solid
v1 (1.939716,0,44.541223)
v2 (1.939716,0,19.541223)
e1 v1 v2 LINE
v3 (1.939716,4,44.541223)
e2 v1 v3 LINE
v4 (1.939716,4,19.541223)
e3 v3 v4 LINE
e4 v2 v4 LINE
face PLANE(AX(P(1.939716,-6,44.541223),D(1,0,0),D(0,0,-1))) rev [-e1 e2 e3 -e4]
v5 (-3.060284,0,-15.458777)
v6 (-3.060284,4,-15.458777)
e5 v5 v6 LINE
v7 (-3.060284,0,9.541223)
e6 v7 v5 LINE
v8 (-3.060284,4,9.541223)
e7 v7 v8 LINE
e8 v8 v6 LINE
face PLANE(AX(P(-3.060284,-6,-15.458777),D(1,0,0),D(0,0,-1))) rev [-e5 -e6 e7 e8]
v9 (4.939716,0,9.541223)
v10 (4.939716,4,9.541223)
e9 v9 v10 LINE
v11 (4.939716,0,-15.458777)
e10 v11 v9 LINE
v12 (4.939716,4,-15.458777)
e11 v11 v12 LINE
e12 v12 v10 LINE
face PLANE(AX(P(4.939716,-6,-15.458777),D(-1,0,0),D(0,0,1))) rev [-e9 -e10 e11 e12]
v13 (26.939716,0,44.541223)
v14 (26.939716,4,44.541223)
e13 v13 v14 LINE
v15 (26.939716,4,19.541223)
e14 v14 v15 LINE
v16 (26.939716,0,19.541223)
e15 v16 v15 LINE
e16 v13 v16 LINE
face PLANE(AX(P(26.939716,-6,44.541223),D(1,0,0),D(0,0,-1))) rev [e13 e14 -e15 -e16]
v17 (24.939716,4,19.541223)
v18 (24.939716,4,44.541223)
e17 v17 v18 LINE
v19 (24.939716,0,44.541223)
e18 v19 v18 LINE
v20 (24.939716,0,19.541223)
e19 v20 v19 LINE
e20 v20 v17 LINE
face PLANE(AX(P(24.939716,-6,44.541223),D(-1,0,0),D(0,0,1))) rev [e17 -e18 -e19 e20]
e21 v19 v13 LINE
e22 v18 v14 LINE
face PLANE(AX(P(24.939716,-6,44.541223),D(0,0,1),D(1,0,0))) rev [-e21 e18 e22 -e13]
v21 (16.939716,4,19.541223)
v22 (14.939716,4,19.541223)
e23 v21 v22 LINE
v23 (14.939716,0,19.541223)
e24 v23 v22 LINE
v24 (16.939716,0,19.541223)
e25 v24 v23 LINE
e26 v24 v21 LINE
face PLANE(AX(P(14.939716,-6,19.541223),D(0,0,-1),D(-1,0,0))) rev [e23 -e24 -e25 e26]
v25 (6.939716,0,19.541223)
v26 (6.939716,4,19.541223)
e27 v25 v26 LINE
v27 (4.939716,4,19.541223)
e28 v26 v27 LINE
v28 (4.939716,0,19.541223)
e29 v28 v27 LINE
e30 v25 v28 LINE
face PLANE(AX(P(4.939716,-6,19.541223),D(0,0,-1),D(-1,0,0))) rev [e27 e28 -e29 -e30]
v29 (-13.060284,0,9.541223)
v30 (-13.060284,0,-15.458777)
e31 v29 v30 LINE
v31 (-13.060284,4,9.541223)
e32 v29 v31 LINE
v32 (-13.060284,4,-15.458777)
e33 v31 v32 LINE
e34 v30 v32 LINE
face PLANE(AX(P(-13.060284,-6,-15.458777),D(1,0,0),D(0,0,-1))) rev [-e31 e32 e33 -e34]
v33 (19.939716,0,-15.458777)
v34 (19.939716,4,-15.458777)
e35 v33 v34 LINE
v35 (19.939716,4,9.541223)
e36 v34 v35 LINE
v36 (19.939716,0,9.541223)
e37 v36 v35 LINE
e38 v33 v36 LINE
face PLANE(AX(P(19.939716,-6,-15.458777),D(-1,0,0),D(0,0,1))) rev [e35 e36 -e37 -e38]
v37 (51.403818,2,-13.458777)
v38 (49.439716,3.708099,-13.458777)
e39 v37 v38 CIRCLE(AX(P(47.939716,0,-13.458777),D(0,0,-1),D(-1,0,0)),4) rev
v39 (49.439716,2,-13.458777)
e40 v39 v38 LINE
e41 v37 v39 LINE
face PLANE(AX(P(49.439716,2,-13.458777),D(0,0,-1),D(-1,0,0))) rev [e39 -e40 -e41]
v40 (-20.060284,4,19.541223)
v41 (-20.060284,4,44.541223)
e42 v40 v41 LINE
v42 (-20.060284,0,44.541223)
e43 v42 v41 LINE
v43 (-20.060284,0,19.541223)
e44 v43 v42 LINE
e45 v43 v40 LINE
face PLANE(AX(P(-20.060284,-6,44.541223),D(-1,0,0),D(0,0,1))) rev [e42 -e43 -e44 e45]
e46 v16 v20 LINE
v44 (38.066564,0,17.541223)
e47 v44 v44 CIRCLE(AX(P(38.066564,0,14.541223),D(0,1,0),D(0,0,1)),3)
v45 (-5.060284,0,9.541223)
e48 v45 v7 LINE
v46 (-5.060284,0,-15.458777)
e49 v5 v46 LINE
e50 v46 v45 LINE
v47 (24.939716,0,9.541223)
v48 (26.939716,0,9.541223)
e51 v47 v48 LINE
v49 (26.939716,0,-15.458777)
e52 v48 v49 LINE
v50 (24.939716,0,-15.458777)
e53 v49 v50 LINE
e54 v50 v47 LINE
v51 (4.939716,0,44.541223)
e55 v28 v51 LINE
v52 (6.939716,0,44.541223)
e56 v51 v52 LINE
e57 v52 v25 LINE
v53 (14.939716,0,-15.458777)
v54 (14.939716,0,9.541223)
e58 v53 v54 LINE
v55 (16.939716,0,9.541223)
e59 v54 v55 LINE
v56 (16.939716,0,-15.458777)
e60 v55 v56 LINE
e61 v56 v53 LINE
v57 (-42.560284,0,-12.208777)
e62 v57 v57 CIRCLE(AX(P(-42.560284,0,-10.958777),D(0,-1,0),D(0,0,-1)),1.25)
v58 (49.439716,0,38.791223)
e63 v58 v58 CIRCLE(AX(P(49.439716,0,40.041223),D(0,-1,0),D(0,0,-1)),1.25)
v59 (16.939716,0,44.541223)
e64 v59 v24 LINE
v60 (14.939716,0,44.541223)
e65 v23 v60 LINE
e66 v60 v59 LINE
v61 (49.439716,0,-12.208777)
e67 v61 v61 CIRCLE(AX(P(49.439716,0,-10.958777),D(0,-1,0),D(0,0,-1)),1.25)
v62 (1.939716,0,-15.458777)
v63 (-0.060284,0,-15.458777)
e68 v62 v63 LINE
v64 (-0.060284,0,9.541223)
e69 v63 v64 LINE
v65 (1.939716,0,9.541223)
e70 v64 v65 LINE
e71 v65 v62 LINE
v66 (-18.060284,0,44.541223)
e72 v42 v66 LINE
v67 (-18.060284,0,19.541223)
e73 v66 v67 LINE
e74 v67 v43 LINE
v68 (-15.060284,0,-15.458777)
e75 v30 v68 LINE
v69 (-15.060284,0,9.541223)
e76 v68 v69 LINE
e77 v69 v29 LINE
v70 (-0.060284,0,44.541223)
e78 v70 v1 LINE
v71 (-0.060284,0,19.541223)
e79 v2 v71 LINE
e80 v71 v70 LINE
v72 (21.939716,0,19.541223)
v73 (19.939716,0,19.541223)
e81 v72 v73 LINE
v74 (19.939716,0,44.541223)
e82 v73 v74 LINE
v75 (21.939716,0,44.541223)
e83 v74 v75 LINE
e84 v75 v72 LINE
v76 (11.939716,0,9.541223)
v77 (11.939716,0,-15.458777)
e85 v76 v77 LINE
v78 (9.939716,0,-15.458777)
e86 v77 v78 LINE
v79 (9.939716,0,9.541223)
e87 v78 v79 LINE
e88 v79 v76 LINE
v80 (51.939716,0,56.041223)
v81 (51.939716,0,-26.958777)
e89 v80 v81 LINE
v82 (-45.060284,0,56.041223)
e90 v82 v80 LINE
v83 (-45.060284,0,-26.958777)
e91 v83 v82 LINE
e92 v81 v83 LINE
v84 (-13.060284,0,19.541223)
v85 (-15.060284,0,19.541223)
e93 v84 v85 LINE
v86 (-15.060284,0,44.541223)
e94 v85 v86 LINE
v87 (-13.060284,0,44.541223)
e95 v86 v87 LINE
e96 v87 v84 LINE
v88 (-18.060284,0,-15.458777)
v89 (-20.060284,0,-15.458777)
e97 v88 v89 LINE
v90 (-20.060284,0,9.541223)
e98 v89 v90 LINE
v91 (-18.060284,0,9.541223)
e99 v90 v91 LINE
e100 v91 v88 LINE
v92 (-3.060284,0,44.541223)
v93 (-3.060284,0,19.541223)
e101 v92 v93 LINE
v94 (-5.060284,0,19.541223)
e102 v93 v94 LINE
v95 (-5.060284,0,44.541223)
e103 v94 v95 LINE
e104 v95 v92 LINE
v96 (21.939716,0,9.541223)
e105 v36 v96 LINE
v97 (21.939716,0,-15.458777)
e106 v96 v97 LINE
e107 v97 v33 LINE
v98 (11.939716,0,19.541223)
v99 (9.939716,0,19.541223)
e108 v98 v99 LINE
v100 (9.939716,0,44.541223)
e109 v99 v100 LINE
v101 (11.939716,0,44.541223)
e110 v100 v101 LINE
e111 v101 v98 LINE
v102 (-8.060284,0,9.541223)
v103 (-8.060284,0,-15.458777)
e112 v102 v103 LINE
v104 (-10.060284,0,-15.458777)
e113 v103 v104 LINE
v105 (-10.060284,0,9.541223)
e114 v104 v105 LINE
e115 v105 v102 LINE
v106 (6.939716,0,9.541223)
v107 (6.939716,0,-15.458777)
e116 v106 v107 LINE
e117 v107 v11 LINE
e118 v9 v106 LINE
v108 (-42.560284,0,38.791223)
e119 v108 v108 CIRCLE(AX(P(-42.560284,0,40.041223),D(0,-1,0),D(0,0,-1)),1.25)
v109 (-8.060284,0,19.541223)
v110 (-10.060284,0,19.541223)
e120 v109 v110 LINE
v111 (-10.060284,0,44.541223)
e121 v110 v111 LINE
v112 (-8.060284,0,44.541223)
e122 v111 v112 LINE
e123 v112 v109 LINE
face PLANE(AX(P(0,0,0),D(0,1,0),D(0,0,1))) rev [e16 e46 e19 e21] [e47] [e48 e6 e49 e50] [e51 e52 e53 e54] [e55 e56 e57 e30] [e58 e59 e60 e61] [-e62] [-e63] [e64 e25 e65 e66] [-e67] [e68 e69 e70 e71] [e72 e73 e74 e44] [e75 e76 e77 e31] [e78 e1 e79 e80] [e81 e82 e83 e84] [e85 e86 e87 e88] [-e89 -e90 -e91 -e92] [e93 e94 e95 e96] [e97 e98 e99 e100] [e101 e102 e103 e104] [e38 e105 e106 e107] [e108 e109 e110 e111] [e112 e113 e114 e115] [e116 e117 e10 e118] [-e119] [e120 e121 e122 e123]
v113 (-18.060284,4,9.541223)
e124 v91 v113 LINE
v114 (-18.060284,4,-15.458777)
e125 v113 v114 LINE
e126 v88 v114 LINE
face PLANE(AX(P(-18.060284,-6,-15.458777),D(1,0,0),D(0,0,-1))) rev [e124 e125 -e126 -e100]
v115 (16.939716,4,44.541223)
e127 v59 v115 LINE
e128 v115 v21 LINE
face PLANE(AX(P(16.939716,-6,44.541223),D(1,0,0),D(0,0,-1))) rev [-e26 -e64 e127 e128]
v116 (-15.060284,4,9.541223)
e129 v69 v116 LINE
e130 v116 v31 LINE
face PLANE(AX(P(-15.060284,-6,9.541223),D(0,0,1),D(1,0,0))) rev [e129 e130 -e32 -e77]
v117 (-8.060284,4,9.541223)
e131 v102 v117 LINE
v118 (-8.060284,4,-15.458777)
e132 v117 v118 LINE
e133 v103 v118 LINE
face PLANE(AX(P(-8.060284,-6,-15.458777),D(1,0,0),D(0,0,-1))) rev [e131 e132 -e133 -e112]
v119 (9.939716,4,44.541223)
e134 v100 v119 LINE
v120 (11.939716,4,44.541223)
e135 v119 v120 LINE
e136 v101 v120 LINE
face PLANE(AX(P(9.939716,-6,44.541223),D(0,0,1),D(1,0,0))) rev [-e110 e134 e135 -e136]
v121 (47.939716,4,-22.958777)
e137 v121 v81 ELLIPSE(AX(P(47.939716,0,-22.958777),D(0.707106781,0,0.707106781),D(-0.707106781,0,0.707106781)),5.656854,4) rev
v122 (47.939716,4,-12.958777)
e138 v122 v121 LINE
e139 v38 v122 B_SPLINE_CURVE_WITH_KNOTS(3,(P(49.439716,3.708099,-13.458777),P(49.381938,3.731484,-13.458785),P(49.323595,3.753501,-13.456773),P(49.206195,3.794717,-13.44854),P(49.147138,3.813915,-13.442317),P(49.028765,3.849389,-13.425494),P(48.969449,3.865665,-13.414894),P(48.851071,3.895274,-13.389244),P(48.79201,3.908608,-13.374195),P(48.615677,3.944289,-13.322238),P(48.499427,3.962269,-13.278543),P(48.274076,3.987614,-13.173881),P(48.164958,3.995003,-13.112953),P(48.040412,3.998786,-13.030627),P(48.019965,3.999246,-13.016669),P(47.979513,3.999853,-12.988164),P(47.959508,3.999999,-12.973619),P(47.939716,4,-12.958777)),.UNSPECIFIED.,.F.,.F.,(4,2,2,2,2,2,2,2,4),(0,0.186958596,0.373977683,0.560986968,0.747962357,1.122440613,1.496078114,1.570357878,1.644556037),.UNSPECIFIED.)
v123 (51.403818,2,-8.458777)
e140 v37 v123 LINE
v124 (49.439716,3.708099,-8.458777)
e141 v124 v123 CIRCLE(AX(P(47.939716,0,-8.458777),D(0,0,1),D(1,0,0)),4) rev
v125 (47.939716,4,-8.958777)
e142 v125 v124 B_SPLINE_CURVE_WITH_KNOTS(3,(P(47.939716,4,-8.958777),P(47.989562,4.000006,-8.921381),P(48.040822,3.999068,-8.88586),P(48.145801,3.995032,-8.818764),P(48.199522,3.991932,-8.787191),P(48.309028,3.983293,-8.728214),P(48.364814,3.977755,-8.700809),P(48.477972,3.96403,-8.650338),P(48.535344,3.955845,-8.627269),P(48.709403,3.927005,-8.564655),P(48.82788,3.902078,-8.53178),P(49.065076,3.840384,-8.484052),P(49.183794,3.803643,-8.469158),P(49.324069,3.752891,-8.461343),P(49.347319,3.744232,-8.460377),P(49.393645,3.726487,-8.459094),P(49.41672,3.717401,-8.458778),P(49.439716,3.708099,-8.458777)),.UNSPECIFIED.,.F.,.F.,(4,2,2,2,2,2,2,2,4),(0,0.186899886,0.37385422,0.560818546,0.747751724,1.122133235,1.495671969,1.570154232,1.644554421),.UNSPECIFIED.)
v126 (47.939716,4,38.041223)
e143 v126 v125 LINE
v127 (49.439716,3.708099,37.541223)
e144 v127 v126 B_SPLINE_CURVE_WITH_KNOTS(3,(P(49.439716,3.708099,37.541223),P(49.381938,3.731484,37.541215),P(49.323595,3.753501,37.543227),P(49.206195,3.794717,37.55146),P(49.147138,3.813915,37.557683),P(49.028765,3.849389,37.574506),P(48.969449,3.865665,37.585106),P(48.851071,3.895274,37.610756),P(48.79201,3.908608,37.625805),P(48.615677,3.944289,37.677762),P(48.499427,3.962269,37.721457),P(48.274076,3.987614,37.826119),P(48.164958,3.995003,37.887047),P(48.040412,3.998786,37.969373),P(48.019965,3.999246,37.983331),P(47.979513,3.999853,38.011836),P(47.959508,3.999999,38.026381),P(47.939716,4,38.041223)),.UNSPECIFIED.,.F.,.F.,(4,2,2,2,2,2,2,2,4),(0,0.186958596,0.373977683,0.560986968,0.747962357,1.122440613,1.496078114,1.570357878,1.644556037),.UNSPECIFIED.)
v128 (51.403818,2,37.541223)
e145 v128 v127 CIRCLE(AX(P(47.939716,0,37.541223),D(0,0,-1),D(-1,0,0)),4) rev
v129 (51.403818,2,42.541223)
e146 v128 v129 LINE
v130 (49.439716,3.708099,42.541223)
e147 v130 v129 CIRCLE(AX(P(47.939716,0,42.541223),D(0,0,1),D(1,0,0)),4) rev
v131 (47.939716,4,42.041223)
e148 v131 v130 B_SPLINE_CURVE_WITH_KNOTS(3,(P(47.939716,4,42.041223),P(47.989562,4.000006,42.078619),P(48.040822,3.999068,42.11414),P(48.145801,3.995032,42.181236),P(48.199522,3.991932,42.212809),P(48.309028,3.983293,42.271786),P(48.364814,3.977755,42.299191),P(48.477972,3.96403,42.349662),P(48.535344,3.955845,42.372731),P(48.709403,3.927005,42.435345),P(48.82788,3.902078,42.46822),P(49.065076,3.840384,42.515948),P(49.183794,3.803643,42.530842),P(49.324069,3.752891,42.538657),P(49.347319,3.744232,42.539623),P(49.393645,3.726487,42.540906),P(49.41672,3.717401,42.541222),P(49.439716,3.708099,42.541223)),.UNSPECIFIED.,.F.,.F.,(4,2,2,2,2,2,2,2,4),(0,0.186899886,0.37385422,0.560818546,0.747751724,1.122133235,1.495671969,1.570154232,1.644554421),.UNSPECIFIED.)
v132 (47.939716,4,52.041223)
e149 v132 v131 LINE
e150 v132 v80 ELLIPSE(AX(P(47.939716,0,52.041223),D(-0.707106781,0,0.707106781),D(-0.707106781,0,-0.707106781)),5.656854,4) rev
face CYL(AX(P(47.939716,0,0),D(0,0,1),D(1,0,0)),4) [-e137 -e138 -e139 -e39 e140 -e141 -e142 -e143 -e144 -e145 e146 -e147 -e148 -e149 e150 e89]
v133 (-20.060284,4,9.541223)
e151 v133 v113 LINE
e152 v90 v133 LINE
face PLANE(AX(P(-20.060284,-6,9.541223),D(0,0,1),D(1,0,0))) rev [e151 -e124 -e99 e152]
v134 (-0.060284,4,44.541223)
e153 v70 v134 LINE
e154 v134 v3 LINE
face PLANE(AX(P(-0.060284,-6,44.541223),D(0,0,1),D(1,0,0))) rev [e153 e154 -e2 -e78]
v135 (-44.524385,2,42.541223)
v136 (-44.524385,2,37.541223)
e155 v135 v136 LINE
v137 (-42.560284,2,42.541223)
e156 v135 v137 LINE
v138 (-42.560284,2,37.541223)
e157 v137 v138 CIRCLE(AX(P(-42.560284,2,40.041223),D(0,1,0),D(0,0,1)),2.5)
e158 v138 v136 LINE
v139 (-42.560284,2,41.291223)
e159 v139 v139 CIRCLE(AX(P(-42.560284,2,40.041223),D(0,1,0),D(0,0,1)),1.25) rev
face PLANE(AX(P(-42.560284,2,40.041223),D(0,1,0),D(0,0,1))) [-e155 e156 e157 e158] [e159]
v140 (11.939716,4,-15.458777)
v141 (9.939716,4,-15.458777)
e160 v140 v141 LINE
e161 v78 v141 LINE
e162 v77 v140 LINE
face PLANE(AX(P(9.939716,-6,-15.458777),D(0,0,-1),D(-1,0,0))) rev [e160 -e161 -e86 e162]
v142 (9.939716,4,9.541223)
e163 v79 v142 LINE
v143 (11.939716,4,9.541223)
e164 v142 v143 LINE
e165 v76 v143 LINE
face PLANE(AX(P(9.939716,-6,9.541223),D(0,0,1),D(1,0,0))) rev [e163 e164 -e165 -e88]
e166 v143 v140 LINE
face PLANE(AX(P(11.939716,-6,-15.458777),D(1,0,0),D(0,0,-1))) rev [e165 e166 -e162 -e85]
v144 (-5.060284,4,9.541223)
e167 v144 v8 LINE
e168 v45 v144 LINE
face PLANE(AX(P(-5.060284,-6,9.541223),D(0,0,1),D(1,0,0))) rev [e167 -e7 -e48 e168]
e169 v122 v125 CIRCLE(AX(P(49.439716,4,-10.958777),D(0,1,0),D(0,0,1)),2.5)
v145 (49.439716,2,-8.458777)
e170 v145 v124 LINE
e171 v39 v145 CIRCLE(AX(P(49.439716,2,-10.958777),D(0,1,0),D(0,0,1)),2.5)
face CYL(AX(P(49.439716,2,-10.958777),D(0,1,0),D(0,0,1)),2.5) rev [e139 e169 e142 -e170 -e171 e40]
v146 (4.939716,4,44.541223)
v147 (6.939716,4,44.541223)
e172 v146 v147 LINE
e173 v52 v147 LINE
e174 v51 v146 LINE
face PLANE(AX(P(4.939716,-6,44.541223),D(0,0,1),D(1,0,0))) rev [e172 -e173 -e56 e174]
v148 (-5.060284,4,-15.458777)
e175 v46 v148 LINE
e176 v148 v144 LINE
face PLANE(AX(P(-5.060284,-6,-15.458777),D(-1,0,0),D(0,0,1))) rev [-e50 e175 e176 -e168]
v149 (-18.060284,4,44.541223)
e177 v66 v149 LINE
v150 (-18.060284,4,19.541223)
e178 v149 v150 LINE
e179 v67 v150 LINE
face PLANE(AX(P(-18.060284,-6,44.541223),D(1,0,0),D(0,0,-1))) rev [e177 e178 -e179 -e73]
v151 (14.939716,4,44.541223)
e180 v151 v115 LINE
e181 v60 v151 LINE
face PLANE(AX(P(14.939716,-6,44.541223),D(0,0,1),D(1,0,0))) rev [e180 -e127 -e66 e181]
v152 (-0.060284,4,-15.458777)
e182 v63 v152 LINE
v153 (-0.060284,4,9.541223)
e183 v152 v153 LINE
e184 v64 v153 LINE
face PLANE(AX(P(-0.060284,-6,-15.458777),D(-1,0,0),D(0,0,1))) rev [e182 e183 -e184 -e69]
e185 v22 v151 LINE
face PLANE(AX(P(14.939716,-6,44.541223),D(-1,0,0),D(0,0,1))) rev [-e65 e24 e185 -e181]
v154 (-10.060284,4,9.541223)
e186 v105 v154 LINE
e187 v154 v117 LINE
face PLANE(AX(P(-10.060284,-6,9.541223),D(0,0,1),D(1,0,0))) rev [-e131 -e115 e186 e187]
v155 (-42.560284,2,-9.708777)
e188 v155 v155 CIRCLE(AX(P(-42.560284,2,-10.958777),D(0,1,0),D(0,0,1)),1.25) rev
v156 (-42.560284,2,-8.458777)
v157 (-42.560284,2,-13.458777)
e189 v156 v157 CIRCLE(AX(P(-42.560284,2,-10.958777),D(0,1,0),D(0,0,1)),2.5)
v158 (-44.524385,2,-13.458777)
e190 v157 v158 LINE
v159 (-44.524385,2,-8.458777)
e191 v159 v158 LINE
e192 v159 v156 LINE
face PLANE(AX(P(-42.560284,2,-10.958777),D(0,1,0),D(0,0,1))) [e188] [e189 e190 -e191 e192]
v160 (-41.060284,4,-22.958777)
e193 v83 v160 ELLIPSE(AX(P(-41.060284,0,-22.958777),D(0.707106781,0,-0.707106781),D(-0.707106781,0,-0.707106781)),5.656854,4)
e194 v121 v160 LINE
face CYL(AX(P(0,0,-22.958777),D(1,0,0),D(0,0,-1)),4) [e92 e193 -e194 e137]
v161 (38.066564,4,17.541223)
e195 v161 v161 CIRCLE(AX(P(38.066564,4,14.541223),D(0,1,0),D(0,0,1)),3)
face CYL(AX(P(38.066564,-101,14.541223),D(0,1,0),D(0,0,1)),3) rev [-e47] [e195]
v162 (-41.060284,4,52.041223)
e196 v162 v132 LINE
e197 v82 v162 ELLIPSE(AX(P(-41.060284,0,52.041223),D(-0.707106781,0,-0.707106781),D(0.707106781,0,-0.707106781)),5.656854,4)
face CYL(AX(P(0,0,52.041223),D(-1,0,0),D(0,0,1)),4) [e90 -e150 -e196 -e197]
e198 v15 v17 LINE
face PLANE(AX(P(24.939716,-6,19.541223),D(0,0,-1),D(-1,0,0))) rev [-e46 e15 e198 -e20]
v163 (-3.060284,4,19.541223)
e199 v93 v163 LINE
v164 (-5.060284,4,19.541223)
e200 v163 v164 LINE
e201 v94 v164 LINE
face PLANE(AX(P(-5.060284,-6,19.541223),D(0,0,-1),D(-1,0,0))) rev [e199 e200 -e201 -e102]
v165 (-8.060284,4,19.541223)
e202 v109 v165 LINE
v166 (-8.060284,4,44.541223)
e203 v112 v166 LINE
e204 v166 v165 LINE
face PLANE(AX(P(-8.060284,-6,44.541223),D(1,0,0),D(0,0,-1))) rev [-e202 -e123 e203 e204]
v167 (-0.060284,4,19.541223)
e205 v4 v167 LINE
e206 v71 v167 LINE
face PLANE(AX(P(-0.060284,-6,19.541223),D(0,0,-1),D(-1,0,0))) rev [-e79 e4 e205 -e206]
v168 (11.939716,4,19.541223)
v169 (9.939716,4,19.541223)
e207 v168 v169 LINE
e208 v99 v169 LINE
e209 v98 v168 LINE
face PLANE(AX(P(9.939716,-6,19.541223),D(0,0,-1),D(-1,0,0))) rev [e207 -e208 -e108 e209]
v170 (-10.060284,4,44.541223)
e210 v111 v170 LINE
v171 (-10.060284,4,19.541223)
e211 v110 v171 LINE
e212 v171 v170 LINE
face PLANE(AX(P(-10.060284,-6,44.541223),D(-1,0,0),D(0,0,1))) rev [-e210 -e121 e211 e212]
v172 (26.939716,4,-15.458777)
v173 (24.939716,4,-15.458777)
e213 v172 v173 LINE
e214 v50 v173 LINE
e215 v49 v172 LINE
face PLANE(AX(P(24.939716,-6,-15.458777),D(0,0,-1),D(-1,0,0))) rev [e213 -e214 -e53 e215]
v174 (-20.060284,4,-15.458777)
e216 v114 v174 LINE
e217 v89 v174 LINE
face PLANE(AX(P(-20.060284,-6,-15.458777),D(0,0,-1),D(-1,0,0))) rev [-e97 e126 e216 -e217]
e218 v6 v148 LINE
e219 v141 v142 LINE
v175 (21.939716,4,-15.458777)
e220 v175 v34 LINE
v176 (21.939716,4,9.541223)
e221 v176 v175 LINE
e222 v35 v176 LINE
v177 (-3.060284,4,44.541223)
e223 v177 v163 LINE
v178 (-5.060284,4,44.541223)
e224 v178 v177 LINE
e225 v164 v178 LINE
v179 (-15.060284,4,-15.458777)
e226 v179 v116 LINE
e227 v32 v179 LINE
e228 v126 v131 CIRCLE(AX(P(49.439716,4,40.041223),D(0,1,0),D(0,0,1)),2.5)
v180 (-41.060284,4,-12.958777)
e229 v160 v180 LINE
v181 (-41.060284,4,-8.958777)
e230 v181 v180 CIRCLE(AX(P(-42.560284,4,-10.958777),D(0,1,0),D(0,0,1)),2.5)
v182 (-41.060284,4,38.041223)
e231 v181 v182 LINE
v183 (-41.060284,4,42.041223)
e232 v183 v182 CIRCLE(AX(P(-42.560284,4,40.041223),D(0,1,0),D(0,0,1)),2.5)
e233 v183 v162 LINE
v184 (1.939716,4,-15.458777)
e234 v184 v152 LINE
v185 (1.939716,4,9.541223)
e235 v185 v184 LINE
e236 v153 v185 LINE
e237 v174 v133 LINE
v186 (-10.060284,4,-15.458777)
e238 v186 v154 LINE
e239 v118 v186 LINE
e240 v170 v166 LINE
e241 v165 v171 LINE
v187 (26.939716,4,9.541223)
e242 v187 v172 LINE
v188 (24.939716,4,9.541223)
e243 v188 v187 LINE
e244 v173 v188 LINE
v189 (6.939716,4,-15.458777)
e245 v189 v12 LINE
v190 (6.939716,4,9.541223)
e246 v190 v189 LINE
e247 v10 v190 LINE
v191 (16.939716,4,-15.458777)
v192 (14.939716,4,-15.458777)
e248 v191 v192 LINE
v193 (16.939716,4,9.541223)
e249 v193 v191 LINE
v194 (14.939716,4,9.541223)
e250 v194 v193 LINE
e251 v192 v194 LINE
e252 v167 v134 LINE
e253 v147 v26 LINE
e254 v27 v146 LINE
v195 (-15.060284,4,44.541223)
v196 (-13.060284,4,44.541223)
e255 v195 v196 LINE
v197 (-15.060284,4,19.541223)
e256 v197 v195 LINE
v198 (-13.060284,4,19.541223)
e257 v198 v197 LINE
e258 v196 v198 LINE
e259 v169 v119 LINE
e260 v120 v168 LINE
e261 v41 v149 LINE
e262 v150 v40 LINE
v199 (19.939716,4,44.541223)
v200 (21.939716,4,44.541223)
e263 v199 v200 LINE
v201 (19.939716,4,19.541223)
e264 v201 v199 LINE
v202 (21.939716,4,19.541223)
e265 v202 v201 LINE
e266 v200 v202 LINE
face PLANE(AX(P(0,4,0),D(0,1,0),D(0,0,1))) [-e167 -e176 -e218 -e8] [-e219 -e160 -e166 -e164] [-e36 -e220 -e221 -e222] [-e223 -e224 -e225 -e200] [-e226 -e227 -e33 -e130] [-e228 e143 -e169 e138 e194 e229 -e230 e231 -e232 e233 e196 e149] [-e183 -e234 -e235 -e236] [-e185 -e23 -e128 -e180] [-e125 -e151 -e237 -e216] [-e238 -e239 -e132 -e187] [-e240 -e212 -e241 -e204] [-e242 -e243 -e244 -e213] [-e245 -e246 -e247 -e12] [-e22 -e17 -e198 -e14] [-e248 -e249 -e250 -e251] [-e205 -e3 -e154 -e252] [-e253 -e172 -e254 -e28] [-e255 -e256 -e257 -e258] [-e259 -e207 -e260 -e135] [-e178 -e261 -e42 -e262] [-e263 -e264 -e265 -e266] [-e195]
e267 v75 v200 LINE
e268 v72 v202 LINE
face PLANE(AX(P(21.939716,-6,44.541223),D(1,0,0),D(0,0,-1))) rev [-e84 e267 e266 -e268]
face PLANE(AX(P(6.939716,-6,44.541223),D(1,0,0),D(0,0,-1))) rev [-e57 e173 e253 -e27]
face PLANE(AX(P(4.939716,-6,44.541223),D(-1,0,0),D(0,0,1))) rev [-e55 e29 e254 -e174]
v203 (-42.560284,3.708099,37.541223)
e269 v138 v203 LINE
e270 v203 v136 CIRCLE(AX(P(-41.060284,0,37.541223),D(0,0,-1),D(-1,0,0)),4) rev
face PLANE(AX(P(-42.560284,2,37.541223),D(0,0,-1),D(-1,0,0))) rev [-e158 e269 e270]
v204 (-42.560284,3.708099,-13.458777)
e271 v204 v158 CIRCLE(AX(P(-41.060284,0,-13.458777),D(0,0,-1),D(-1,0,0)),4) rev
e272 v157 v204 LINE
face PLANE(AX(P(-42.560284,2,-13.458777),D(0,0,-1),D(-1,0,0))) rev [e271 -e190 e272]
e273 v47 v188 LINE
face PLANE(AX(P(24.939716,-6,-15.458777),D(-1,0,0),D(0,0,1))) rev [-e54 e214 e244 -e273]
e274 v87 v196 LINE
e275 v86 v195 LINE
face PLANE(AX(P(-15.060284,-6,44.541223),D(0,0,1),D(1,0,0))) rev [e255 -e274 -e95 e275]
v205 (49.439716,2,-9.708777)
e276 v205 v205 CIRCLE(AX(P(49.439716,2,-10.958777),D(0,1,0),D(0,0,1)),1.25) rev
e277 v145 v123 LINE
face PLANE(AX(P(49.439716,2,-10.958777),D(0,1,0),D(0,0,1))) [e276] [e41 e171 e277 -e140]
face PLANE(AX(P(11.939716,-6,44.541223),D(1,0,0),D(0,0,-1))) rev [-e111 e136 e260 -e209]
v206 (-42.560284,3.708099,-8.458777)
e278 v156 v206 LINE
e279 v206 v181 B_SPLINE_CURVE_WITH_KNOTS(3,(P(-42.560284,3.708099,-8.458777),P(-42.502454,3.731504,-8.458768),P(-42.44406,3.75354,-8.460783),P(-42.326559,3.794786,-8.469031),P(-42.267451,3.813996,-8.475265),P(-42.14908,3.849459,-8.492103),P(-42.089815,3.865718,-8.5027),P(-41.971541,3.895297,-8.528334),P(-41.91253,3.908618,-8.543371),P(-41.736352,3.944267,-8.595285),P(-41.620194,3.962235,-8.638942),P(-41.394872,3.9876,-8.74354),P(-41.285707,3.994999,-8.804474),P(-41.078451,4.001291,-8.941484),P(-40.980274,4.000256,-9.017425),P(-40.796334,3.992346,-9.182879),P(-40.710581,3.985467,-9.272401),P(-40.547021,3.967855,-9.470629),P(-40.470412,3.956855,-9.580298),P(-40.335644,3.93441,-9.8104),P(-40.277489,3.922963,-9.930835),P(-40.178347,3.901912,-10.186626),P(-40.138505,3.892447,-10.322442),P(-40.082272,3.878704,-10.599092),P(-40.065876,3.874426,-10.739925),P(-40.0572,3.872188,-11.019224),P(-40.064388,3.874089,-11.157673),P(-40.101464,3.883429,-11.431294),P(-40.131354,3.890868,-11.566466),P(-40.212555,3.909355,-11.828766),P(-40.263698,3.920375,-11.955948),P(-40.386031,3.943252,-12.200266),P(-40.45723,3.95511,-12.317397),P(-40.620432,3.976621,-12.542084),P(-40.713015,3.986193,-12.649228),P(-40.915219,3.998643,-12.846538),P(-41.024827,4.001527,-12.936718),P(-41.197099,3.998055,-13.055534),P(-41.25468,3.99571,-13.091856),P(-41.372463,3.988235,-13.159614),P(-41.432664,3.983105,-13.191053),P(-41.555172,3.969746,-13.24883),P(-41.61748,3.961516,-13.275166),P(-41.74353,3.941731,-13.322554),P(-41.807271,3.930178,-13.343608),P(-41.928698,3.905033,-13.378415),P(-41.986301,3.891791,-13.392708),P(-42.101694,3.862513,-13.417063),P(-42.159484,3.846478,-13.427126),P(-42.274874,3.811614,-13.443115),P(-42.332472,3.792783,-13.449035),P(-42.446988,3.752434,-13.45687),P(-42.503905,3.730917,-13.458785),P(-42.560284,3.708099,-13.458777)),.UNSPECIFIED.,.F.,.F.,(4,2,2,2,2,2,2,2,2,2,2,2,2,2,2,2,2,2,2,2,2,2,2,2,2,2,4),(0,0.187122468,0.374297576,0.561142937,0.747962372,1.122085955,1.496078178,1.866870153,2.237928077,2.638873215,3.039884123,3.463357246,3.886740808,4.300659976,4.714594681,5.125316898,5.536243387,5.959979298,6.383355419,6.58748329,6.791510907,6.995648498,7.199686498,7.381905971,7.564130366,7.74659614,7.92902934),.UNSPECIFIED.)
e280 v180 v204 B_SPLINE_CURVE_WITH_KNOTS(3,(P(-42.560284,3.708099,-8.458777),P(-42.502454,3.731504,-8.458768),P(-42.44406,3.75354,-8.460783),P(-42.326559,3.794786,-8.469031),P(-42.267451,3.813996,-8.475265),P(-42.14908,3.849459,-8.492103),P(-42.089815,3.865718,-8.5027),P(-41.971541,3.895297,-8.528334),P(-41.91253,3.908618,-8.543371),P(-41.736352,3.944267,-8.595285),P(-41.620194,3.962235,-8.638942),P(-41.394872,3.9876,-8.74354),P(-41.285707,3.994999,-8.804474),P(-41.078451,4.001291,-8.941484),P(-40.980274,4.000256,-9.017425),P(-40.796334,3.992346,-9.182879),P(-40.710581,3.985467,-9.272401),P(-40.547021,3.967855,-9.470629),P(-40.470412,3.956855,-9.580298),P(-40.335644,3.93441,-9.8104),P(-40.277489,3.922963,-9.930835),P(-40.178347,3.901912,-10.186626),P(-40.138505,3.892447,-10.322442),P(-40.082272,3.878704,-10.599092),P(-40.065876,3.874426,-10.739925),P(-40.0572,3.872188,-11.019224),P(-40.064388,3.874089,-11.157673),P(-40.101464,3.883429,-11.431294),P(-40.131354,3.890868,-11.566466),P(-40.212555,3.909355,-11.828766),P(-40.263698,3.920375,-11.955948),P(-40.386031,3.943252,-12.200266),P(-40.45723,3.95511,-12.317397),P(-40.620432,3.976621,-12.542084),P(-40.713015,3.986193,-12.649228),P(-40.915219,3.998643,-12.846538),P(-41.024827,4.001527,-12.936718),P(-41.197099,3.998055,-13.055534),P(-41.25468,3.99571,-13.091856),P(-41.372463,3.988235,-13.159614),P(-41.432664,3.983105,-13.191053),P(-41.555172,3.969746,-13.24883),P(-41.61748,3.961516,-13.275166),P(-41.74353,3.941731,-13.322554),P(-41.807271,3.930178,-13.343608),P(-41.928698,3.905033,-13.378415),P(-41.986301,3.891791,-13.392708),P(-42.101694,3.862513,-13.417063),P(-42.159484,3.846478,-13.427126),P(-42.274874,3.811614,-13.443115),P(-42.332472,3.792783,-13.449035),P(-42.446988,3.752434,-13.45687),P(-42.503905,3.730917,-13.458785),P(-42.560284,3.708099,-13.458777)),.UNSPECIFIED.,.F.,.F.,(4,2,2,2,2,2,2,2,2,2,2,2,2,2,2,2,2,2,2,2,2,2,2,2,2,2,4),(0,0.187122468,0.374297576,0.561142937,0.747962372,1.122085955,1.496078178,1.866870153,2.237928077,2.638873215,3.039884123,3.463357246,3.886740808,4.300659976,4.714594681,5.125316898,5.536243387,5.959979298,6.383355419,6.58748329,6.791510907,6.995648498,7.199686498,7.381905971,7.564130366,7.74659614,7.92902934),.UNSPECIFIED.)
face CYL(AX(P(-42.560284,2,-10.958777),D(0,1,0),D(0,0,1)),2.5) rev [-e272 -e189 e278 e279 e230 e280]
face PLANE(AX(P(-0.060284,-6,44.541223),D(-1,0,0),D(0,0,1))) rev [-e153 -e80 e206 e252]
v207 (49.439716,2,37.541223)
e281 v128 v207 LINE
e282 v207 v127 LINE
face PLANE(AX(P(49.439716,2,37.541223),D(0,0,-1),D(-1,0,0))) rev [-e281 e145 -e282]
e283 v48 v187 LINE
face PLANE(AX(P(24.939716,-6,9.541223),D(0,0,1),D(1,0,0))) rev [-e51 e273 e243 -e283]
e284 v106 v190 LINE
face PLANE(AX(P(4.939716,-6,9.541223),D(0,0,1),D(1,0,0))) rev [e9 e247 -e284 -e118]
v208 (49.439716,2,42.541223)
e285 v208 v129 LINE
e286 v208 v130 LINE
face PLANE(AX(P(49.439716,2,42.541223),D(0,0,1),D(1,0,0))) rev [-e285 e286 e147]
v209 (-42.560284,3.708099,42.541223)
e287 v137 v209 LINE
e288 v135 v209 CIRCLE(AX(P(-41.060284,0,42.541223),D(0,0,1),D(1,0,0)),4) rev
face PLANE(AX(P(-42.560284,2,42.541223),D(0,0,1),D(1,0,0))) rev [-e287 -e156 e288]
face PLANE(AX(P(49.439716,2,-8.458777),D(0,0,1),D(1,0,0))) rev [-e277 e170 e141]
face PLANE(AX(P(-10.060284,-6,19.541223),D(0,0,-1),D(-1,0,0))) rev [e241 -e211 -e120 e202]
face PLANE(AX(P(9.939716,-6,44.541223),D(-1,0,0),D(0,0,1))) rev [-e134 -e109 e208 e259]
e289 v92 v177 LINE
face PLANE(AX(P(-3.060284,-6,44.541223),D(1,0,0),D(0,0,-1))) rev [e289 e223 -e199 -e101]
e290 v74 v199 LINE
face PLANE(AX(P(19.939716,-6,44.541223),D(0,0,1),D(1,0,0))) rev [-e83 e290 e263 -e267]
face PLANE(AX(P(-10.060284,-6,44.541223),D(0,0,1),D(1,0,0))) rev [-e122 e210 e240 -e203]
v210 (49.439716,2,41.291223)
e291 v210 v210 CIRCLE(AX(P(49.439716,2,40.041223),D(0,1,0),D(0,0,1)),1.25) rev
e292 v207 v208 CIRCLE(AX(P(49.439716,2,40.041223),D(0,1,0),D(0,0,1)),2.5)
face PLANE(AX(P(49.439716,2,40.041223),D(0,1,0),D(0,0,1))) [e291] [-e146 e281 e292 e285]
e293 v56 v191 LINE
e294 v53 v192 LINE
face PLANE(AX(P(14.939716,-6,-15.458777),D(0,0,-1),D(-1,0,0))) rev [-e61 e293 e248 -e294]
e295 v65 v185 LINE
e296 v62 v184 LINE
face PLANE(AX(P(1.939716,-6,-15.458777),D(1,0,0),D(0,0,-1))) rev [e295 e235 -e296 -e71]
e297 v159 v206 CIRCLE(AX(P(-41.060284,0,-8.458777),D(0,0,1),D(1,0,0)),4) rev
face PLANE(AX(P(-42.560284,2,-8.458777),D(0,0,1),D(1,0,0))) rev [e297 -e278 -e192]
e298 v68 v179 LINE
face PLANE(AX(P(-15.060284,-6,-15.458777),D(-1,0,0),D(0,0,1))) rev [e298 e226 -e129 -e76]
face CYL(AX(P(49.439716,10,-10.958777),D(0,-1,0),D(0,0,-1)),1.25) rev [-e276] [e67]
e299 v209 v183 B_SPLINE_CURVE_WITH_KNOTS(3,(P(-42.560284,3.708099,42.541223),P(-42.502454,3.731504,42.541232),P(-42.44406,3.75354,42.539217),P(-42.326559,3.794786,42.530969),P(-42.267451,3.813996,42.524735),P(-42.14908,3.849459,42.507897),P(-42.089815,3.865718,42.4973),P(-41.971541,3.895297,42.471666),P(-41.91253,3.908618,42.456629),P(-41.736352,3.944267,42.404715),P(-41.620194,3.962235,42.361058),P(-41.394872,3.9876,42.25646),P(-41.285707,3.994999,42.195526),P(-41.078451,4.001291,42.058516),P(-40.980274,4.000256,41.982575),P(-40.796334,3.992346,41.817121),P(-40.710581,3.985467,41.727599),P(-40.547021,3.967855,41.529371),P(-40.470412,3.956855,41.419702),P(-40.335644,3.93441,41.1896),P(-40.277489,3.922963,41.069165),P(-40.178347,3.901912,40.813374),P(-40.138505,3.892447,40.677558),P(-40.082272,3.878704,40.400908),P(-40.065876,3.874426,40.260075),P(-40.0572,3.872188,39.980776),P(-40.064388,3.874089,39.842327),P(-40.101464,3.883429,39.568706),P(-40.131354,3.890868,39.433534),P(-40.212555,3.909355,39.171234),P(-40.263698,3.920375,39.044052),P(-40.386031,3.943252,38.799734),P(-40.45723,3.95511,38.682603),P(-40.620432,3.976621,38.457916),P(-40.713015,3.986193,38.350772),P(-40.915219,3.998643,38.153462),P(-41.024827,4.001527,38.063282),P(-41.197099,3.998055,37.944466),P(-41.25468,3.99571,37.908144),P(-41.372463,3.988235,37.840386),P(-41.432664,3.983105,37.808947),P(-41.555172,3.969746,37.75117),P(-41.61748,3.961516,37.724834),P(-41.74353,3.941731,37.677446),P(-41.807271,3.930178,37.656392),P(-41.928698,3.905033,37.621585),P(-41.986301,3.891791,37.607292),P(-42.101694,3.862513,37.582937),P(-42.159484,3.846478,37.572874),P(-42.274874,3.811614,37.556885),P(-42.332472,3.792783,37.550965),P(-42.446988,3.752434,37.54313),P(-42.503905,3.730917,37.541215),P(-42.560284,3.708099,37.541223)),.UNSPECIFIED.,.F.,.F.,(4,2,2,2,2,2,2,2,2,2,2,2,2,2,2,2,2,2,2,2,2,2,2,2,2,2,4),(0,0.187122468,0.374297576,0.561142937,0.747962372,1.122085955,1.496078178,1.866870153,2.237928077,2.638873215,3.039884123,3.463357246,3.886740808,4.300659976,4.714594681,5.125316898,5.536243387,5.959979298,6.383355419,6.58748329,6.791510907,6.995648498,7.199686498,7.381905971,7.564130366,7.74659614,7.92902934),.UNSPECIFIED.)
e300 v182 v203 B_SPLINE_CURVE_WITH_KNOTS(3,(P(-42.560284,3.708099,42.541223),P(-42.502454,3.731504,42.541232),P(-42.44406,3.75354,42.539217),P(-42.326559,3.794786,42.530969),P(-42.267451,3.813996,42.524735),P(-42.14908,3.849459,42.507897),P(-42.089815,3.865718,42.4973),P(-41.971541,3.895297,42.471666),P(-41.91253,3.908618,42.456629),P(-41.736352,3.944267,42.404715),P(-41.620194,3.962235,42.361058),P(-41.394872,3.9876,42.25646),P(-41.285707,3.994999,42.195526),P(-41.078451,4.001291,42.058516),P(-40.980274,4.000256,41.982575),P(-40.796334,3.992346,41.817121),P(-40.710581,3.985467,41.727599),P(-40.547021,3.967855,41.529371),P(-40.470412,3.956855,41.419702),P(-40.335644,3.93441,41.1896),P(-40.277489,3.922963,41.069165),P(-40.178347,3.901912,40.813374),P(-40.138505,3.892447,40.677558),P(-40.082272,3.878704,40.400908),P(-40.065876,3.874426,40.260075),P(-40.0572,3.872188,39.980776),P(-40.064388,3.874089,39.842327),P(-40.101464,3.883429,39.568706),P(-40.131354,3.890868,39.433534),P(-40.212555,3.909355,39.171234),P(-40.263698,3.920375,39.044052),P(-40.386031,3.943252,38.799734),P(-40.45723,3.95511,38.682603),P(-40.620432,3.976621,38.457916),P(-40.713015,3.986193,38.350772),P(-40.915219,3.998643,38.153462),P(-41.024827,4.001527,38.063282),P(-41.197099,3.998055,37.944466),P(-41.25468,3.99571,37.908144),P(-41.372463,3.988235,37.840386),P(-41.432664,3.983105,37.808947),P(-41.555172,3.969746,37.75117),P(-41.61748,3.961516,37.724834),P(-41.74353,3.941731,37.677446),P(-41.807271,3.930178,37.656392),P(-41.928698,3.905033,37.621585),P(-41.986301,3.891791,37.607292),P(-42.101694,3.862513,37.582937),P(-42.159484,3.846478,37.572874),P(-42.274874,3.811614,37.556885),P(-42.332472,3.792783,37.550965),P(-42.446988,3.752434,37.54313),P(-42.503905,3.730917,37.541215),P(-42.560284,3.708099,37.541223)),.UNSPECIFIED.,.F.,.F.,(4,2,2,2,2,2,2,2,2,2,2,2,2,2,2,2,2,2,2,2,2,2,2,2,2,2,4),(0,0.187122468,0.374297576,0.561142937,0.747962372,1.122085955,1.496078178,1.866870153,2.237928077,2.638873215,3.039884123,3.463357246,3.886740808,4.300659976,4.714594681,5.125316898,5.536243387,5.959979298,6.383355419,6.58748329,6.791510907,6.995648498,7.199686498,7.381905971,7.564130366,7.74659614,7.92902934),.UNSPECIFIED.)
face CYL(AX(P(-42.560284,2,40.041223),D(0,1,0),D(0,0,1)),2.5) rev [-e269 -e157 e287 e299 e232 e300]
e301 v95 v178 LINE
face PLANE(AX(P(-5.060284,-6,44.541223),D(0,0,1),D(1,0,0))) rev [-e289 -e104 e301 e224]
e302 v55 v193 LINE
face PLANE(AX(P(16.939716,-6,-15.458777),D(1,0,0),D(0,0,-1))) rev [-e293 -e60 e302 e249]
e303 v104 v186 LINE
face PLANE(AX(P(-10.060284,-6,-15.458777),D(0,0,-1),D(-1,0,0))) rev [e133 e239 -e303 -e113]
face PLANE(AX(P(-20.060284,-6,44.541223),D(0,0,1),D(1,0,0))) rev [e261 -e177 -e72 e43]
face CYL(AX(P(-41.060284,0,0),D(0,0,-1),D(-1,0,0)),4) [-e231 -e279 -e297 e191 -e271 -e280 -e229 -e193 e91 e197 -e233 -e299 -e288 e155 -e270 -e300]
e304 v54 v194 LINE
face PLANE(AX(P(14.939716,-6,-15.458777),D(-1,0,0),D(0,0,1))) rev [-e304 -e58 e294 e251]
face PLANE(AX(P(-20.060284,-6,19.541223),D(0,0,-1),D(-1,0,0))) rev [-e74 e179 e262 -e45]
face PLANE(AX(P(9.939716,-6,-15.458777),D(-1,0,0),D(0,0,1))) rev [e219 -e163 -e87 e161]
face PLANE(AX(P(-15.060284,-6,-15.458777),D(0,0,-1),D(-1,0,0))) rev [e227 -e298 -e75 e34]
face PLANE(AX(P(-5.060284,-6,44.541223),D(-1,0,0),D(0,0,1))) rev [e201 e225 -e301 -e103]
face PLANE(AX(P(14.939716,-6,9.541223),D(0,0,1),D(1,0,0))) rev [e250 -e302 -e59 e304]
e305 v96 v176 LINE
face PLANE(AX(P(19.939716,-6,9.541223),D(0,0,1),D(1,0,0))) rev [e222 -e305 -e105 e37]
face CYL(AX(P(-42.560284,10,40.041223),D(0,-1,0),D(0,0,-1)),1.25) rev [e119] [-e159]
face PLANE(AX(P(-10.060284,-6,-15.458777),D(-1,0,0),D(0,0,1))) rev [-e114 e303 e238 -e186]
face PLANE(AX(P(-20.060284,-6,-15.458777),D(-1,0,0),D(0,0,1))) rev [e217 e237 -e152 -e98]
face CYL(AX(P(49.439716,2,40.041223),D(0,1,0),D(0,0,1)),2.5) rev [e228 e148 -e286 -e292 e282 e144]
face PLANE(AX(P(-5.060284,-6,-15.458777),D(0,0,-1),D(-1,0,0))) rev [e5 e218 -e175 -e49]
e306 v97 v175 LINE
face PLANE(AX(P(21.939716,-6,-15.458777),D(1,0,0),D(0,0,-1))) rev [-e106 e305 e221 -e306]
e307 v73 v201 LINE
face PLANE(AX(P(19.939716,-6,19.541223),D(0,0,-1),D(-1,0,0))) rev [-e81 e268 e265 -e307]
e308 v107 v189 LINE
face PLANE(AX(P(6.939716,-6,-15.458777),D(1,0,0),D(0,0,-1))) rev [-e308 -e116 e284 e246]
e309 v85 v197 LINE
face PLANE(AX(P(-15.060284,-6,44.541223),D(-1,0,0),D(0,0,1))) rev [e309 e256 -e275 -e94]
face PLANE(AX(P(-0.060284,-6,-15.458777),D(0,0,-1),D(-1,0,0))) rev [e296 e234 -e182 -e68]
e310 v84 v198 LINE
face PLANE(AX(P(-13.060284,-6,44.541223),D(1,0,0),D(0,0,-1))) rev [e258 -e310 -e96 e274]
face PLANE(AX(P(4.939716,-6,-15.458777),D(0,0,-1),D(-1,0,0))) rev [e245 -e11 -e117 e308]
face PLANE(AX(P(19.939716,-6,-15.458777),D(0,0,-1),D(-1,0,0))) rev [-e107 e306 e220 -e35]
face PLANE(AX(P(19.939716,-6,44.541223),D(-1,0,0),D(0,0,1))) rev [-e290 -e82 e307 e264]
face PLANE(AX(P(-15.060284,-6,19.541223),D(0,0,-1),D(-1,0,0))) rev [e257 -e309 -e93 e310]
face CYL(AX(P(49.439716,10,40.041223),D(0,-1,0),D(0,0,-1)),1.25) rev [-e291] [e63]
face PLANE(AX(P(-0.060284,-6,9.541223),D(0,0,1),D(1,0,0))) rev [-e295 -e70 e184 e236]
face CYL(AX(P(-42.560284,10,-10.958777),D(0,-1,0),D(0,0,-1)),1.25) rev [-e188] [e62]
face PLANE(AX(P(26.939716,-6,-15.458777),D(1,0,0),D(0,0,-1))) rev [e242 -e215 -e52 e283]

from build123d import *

# Parameters (mm, degrees)
SKETCH1_W           = 97
SKETCH1_H           = 83
BOSS_EXTRUDE1_DEPTH = 4
FILLET1_R           = 4
SKETCH3_R           = 1.25
CUT_EXTRUDE1_DEPTH  = 10
CUT_EXTRUDE2_DEPTH  = 2
SKETCH5_W           = 2
SKETCH5_H           = 25
CUT_EXTRUDE3_DEPTH  = 10
LPATTERN1_COUNT     = 10
LPATTERN1_PITCH     = 5
SKETCH6_R           = 3
CUT_EXTRUDE4_DEPTH  = 105


with BuildPart() as part:
    # Sketch1 → Boss-Extrude1 (new body)
    with BuildSketch(Plane(origin=(0, 0, 0), x_dir=(1, 0, 0), z_dir=(0, 1, 0))):
        with Locations((3.439716312, -14.541223404)):
            Rectangle(SKETCH1_W, SKETCH1_H)
    extrude(amount=BOSS_EXTRUDE1_DEPTH)

    # Fillet1
    fillet1_edges = [part.edges().sort_by_distance(p)[0] for p in [
        (3.439716312, 4, -26.958776596),
        (51.939716312, 4, 14.541223404),
        (3.439716312, 4, 56.041223404),
        (-45.060283688, 4, 14.541223404),
    ]]
    fillet(fillet1_edges, radius=FILLET1_R - 0.0001)  # a hair under: the kernel refuses the full size

    # Sketch3 → Cut-Extrude1 (cut)
    with BuildSketch(Plane.XZ):
        with Locations(Location((-42.560283688, 40.041223404, 0), (0, 0, 270))):
            Circle(SKETCH3_R)
        with Locations(Location((49.439716312, 40.041223404, 0), (0, 0, 270))):
            Circle(SKETCH3_R)
        with Locations(Location((-42.560283688, -10.958776596, 0), (0, 0, 270))):
            Circle(SKETCH3_R)
        with Locations(Location((49.439716312, -10.958776596, 0), (0, 0, 270))):
            Circle(SKETCH3_R)
    extrude(amount=-CUT_EXTRUDE1_DEPTH, mode=Mode.SUBTRACT)

    # Sketch4 → Cut-Extrude2 (cut)
    with BuildSketch(Plane(origin=(0, 4, 0), x_dir=(1, 0, 0), z_dir=(0, 1, 0))):
        with BuildLine():
            Line((-42.560283688, 13.458776596), (-49.206472021, 13.458776596))
            Line((-49.206472021, 13.458776596), (-49.206472021, 8.458776596))
            Line((-49.206472021, 8.458776596), (-42.560283688, 8.458776596))
            ThreePointArc((-42.560283688, 8.458776596), (-40.060283688, 10.958776596), (-42.560283688, 13.458776596))
        make_face()
        with BuildLine():
            Line((-42.560283688, -37.541223404), (-49.554151242, -37.541223404))
            Line((-49.554151242, -37.541223404), (-49.554151242, -42.541223404))
            Line((-49.554151242, -42.541223404), (-42.560283688, -42.541223404))
            ThreePointArc((-42.560283688, -42.541223404), (-40.060283688, -40.041223404), (-42.560283688, -37.541223404))
        make_face()
        with BuildLine():
            Line((49.439716312, 13.458776596), (53.973660089, 13.458776596))
            Line((53.973660089, 13.458776596), (53.973660089, 8.458776596))
            Line((53.973660089, 8.458776596), (49.439716312, 8.458776596))
            ThreePointArc((49.439716312, 8.458776596), (46.939716312, 10.958776596), (49.439716312, 13.458776596))
        make_face()
        with BuildLine():
            Line((49.439716312, -37.541223404), (55.815990307, -37.541223404))
            Line((55.815990307, -37.541223404), (55.815990307, -42.541223404))
            Line((55.815990307, -42.541223404), (49.439716312, -42.541223404))
            ThreePointArc((49.439716312, -42.541223404), (46.939716312, -40.041223404), (49.439716312, -37.541223404))
        make_face()
    extrude(amount=-CUT_EXTRUDE2_DEPTH, mode=Mode.SUBTRACT)

    # Sketch5 → Cut-Extrude3 (cut)
    with BuildSketch(Plane(origin=(0, 4, 0), x_dir=(1, 0, 0), z_dir=(0, 1, 0))):
        with Locations((-19.060283688, 2.958776596)):
            Rectangle(SKETCH5_W, SKETCH5_H)
        with Locations((-19.060283688, -32.041223404)):
            Rectangle(SKETCH5_W, SKETCH5_H)
    cut_extrude3 = extrude(amount=-CUT_EXTRUDE3_DEPTH, mode=Mode.SUBTRACT)

    # LPattern1: Cut-Extrude3 ×10
    with Locations(*[(i * LPATTERN1_PITCH, 0, 0) for i in range(1, LPATTERN1_COUNT)]):
        add(cut_extrude3, mode=Mode.SUBTRACT)

    # Sketch6 → Cut-Extrude4 (cut)
    with BuildSketch(Plane(origin=(0, 4, 0), x_dir=(1, 0, 0), z_dir=(0, 1, 0))):
        with Locations(Location((38.066563645, -14.541223404, 0), (0, 0, 270))):
            Circle(SKETCH6_R)
    extrude(amount=-CUT_EXTRUDE4_DEPTH, mode=Mode.SUBTRACT)


solid = part.part
